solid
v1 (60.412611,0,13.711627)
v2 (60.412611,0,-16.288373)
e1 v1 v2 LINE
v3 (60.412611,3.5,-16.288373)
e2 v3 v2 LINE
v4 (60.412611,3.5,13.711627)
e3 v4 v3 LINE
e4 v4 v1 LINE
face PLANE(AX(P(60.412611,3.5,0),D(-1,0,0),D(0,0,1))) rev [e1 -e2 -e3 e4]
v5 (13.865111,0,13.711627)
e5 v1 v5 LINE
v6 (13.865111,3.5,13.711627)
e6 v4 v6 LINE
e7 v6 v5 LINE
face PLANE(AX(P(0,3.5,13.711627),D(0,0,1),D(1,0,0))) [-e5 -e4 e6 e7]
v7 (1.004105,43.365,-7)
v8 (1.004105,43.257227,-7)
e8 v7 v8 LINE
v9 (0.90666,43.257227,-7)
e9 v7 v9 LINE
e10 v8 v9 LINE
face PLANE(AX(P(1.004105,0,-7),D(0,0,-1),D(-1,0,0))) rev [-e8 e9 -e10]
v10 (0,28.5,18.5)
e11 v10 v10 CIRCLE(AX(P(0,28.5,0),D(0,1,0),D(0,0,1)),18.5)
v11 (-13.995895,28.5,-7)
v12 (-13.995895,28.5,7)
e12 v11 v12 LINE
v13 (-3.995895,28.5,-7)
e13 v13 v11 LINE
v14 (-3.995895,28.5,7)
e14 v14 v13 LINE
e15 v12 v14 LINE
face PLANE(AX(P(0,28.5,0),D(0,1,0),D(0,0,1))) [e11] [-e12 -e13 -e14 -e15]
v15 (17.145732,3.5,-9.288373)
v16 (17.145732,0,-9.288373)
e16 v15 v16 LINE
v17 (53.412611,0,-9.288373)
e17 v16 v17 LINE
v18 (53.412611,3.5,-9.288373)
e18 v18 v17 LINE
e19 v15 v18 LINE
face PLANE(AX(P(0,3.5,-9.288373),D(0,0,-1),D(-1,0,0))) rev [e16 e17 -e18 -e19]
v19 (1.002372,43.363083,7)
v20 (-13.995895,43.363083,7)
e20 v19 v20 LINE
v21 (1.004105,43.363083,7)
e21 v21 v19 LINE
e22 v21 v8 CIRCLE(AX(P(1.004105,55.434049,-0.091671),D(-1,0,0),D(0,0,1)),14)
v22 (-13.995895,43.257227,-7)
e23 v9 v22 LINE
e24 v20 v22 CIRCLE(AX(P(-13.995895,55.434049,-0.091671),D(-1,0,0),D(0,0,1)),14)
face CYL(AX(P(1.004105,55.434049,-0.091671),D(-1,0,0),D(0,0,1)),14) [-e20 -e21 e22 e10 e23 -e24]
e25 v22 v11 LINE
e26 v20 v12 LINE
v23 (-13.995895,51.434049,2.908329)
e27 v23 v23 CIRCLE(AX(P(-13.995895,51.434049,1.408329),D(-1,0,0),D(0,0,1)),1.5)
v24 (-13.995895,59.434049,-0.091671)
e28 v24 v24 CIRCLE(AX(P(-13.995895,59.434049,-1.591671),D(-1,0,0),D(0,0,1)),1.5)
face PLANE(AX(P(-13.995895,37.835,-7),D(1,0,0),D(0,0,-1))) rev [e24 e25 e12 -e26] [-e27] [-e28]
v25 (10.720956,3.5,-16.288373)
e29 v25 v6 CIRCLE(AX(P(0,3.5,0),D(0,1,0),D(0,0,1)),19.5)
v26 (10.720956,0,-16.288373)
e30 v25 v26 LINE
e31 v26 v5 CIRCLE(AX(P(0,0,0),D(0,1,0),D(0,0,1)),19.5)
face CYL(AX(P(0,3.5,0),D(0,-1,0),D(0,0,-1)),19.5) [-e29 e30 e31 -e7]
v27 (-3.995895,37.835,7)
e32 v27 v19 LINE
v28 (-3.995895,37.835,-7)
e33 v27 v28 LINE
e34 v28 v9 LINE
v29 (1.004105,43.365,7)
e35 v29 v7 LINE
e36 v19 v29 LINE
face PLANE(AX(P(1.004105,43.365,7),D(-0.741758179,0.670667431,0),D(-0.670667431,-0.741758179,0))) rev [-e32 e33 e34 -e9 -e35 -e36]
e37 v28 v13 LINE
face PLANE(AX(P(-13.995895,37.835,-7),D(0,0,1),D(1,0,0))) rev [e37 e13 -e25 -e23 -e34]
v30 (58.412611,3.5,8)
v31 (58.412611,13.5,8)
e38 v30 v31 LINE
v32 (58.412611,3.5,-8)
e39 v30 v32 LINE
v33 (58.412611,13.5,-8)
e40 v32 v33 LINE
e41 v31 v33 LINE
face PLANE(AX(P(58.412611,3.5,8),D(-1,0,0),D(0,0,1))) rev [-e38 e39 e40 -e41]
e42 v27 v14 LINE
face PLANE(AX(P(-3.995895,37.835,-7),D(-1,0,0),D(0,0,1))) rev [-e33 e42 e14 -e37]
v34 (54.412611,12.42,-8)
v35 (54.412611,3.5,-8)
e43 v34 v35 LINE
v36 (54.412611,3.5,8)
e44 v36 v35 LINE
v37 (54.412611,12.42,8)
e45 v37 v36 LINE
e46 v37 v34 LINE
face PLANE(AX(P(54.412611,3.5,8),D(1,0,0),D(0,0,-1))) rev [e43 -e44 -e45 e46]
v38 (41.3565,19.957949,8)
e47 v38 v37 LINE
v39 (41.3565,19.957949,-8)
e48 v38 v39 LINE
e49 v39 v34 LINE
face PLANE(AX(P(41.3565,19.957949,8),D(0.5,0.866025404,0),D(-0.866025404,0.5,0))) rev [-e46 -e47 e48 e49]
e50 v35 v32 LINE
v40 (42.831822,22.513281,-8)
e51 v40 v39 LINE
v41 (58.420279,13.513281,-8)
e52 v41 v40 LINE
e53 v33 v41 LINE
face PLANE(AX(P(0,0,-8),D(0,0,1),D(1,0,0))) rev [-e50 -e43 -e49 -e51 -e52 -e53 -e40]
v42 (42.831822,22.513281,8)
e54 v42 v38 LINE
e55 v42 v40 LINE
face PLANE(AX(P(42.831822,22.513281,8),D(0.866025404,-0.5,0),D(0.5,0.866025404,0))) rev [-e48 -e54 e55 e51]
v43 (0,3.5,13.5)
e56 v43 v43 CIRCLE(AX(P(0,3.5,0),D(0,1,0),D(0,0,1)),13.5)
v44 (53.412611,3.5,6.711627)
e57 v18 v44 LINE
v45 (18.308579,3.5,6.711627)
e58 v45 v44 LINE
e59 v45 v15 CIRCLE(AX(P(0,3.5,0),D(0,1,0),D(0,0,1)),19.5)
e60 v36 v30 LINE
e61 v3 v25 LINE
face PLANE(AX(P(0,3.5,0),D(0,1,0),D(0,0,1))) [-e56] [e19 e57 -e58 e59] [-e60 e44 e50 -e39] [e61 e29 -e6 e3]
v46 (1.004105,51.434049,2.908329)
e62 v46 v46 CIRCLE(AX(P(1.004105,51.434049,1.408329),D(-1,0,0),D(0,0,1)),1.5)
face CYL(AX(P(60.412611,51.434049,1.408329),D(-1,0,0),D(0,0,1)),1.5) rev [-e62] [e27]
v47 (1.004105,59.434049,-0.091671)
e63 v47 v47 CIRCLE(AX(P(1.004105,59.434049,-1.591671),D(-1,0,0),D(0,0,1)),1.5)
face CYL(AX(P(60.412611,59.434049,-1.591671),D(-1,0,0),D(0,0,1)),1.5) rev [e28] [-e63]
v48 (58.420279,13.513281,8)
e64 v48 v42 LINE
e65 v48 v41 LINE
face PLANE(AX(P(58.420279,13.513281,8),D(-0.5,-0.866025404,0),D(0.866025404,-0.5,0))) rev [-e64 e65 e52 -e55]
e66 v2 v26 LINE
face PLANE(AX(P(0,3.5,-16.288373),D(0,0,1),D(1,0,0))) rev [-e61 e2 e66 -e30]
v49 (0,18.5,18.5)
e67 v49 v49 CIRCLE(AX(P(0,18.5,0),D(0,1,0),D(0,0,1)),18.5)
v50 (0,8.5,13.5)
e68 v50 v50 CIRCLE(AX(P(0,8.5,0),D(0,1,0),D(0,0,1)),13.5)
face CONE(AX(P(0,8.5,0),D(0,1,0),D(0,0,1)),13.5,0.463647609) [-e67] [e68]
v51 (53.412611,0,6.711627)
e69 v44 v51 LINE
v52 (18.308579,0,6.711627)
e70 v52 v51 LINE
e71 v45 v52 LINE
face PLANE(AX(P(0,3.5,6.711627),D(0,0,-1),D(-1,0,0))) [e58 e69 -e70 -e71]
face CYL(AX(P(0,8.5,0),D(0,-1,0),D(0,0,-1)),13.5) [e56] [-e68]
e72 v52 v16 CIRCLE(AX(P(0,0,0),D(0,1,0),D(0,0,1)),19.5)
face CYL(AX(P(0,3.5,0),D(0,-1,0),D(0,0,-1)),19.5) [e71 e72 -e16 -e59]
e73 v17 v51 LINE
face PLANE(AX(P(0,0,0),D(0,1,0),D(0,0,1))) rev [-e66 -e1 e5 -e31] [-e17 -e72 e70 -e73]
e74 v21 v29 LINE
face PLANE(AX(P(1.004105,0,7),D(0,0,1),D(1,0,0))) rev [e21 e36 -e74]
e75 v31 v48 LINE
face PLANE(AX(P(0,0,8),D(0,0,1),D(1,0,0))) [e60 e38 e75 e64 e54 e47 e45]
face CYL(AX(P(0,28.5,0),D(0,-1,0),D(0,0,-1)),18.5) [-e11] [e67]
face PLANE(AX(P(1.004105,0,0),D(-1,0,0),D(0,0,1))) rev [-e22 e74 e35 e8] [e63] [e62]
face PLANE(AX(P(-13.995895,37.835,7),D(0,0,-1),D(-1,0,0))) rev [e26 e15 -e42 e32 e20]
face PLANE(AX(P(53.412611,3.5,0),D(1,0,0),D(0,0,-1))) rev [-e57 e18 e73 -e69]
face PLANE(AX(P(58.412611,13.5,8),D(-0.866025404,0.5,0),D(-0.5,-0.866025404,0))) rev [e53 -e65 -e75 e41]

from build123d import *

# Parameters (mm, degrees)
SALIENTE_EXTRUIR1_DEPTH = 3.5
CROQUIS2_R              = 13.5
SALIENTE_EXTRUIR2_DEPTH = 5
CROQUIS4_R              = 18.5
CROQUIS5_R              = 13.5
CROQUIS6_R              = 18.5
SALIENTE_EXTRUIR3_DEPTH = 10
CROQUIS7_W              = 10
CROQUIS7_H              = 14
SALIENTE_EXTRUIR4_DEPTH = 9.335
SALIENTE_EXTRUIR5_DEPTH = 7
SALIENTE_EXTRUIR6_DEPTH = 15
SALIENTE_EXTRUIR7_DEPTH = 8
CROQUIS11_R             = 1.5
CORTAR_EXTRUIR1_DEPTH   = 104.624142837


with BuildPart() as part:
    # Croquis1 → Saliente-Extruir1 (new body)
    with BuildSketch(Plane(origin=(0, 0, 0), x_dir=(1, 0, 0), z_dir=(0, 1, 0))):
        with BuildLine():
            Line((13.865110625, -13.711626722), (60.412611283, -13.711626722))
            Line((60.412611283, -13.711626722), (60.412611283, 16.288373278))
            Line((60.412611283, 16.288373278), (10.720955925, 16.288373278))
            ThreePointArc((10.720955925, 16.288373278), (-19.393779083, -2.032568055), (13.865110625, -13.711626722))
        make_face()
        with BuildLine():
            Line((53.412611283, -6.711626722), (18.308579048, -6.711626722))
            ThreePointArc((18.308579048, -6.711626722), (19.448702808, 1.413491806), (17.145731884, 9.288373278))
            Line((17.145731884, 9.288373278), (53.412611283, 9.288373278))
            Line((53.412611283, 9.288373278), (53.412611283, -6.711626722))
        make_face(mode=Mode.SUBTRACT)
    extrude(amount=SALIENTE_EXTRUIR1_DEPTH)

    # Croquis2 → Saliente-Extruir2 (add)
    with BuildSketch(Plane(origin=(0, 3.5, 0), x_dir=(1, 0, 0), z_dir=(0, 1, 0))):
        Circle(CROQUIS2_R)
    extrude(amount=SALIENTE_EXTRUIR2_DEPTH)

    # Croquis4 → Recubrir2 section 0
    with BuildSketch(Plane(origin=(0, 18.5, 0), x_dir=(1, 0, 0), z_dir=(0, 1, 0))):
        Circle(CROQUIS4_R)
    # Croquis5 → Recubrir2 section 1
    with BuildSketch(Plane(origin=(0, 8.5, 0), x_dir=(1, 0, 0), z_dir=(0, 1, 0))):
        Circle(CROQUIS5_R)
    loft()

    # Croquis6 → Saliente-Extruir3 (add)
    with BuildSketch(Plane(origin=(0, 18.5, 0), x_dir=(1, 0, 0), z_dir=(0, 1, 0))):
        Circle(CROQUIS6_R)
    extrude(amount=SALIENTE_EXTRUIR3_DEPTH)

    # Croquis7 → Saliente-Extruir4 (add)
    with BuildSketch(Plane(origin=(0, 28.5, 0), x_dir=(1, 0, 0), z_dir=(0, 1, 0))):
        with Locations((-8.995895444, 0)):
            Rectangle(CROQUIS7_W, CROQUIS7_H)
    extrude(amount=SALIENTE_EXTRUIR4_DEPTH)

    # Croquis8 → Saliente-Extruir5 (add, symmetric)
    with BuildSketch(Plane.XY):
        Polygon((-13.995895444, 37.835), (-13.995895444, 43.365), (1.004104556, 43.365), (-3.995895444, 37.835), align=None)
    extrude(amount=SALIENTE_EXTRUIR5_DEPTH, both=True)

    # Croquis9 → Saliente-Extruir6 (add)
    with BuildSketch(Plane.ZY.offset(13.995895444)):
        with BuildLine():
            Line((-7, 43.257226645), (-7, 43.365))
            Line((-7, 43.365), (7, 43.365))
            Line((7, 43.365), (7, 43.363083448))
            ThreePointArc((7, 43.363083448), (12.059118842, 48.480035252), (13.908328814, 55.434048604))
            ThreePointArc((13.908328814, 55.434048604), (-7.13735769, 67.531912122), (-7, 43.257226645))
        make_face()
    extrude(amount=-SALIENTE_EXTRUIR6_DEPTH)

    # Croquis10 → Saliente-Extruir7 (add, symmetric)
    with BuildSketch(Plane.XY):
        Polygon((58.412611283, 3.5), (54.412611283, 3.5), (54.412611283, 12.42), (41.356500297, 19.957949192), (42.831821975, 22.513281297), (58.420279243, 13.513281297), (58.412611283, 13.5), align=None)
    extrude(amount=SALIENTE_EXTRUIR7_DEPTH, both=True)

    # Croquis11 → Cortar-Extruir1 (cut, through all)
    with BuildSketch(Plane.ZY.offset(13.995895444)):
        with Locations((-1.591671186, 59.434048604)):
            Circle(CROQUIS11_R)
        with Locations((1.408328814, 51.434048604)):
            Circle(CROQUIS11_R)
    extrude(amount=-CORTAR_EXTRUIR1_DEPTH, mode=Mode.SUBTRACT)


solid = part.part
